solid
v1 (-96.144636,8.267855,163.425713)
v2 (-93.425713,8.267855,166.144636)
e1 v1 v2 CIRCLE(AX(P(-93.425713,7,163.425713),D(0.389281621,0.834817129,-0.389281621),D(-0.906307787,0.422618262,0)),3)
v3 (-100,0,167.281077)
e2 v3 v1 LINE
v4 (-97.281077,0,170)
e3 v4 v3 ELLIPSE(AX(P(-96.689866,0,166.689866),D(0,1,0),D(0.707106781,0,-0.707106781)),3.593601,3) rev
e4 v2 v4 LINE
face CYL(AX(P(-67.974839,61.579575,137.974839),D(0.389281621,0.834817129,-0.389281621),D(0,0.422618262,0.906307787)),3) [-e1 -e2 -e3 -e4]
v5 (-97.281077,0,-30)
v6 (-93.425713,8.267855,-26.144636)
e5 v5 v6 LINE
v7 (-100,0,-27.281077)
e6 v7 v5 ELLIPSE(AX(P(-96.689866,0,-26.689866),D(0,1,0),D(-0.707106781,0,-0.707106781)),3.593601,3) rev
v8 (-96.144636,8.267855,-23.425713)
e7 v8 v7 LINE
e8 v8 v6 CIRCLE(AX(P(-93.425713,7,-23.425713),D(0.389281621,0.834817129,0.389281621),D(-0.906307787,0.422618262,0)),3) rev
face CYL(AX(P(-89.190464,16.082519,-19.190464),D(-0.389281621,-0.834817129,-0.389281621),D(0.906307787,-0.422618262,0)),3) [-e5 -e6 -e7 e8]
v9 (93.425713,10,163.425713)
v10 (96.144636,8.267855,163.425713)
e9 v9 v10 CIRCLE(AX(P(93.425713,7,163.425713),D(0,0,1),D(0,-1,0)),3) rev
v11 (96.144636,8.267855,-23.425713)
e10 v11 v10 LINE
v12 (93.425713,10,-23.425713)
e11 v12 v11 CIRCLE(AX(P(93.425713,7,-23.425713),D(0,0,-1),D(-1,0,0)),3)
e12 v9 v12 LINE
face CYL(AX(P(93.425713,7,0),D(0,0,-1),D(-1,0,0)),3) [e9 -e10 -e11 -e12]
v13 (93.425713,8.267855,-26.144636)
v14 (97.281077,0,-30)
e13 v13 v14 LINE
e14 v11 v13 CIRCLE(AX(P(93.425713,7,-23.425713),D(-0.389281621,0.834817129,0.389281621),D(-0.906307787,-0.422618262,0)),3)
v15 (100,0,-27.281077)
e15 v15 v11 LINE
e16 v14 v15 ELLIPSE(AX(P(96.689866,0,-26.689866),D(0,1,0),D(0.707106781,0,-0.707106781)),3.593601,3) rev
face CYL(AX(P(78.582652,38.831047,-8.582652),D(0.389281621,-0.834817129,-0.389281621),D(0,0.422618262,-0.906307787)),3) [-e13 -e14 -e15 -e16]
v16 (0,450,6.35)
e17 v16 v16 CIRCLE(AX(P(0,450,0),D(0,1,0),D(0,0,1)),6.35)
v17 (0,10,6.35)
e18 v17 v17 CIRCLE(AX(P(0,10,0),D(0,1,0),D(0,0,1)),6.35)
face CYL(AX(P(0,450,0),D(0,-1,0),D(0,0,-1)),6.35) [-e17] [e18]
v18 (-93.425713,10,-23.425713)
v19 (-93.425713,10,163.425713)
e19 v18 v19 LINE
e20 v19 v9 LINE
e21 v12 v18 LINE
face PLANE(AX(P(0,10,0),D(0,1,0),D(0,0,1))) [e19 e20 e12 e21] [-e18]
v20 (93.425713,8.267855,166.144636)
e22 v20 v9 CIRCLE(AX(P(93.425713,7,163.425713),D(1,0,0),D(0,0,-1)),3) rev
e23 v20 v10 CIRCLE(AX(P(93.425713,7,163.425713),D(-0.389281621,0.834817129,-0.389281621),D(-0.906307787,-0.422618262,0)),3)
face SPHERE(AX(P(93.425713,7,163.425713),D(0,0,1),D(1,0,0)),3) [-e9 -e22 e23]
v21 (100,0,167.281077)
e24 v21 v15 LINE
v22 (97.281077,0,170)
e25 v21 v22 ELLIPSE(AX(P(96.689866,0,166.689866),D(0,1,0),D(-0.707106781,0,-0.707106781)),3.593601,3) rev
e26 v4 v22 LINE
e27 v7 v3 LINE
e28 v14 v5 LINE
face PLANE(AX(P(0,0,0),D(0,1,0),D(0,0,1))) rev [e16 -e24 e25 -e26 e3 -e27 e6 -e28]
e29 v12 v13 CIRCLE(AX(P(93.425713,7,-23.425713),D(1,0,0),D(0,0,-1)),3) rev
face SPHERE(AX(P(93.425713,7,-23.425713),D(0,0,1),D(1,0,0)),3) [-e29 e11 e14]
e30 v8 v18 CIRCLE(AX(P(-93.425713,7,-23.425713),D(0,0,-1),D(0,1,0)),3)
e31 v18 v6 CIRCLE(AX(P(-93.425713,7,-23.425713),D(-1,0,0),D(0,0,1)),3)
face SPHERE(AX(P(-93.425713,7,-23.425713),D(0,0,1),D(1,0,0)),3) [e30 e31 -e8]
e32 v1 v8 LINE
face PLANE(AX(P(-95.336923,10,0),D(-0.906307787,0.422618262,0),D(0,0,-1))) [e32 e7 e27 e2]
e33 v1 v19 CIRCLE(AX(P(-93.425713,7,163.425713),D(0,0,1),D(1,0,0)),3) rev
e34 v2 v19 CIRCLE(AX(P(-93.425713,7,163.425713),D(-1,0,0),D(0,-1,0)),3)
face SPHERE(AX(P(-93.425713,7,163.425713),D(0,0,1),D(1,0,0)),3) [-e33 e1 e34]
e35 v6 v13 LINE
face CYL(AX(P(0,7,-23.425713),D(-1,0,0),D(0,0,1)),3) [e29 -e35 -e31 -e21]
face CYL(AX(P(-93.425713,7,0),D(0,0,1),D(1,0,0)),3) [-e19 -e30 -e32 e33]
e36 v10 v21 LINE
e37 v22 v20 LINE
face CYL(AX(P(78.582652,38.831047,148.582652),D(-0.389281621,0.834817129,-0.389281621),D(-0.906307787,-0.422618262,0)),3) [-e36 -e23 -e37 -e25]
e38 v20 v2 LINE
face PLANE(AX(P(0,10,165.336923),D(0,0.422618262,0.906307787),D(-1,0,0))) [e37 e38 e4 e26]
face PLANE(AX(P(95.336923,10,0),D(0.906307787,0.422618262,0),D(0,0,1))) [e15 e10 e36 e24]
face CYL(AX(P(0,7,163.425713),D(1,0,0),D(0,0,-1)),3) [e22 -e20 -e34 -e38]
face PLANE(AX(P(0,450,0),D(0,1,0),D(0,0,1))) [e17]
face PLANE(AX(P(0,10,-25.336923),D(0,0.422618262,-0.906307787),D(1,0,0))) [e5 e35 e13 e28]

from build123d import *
from OCP.BRepFilletAPI import BRepFilletAPI_MakeChamfer

# Parameters (mm, degrees)
SKETCH1_R           = 6.35
BOSS_EXTRUDE1_DEPTH = 450
SKETCH2_W           = 200
SKETCH2_H           = 200
BOSS_EXTRUDE2_DEPTH = 10
CHAMFER1_SIZE       = 10
CHAMFER1_SIZE_2     = 4.663076582
FILLET1_R           = 3


# Some blends are built 0.0001 mm under size
with BuildPart() as part:
    # Sketch1 → Boss-Extrude1 (new body)
    with BuildSketch(Plane(origin=(0, 0, 0), x_dir=(1, 0, 0), z_dir=(0, 1, 0))):
        with Locations(Location((0, 0, 0), (0, 0, 270))):
            Circle(SKETCH1_R)
    extrude(amount=BOSS_EXTRUDE1_DEPTH)

    # Sketch2 → Boss-Extrude2 (add)
    with BuildSketch(Plane(origin=(0, 0, 0), x_dir=(1, 0, 0), z_dir=(0, 1, 0))):
        with Locations((0, -70)):
            Rectangle(SKETCH2_W, SKETCH2_H)
    extrude(amount=BOSS_EXTRUDE2_DEPTH)

    # Chamfer1
    chamfer1_edges_1 = [part.edges().sort_by_distance(p)[0] for p in [
        (-100, 10, 70),
    ]]
    chamfer1_side_1 = [part.faces().sort_by_distance(p)[0] for p in [
        (-100, 9.906738468, 70),
    ]]
    chamfer1_edges_2 = [part.edges().sort_by_distance(p)[0] for p in [
        (0, 10, -30),
    ]]
    chamfer1_side_2 = [part.faces().sort_by_distance(p)[0] for p in [
        (0, 9.906738468, -30),
    ]]
    chamfer1_edges_3 = [part.edges().sort_by_distance(p)[0] for p in [
        (100, 10, 70),
    ]]
    chamfer1_side_3 = [part.faces().sort_by_distance(p)[0] for p in [
        (100, 9.906738468, 70),
    ]]
    chamfer1_edges_4 = [part.edges().sort_by_distance(p)[0] for p in [
        (0, 10, 170),
    ]]
    chamfer1_side_4 = [part.faces().sort_by_distance(p)[0] for p in [
        (0, 9.906738468, 170),
    ]]
    chamfer1 = BRepFilletAPI_MakeChamfer(part.part.solid().wrapped)
    for e in chamfer1_edges_1:
        chamfer1.Add(CHAMFER1_SIZE - 0.0001, CHAMFER1_SIZE_2 - 0.0001, e.wrapped, chamfer1_side_1[0].wrapped)
    for e in chamfer1_edges_2:
        chamfer1.Add(CHAMFER1_SIZE - 0.0001, CHAMFER1_SIZE_2 - 0.0001, e.wrapped, chamfer1_side_2[0].wrapped)
    for e in chamfer1_edges_3:
        chamfer1.Add(CHAMFER1_SIZE - 0.0001, CHAMFER1_SIZE_2 - 0.0001, e.wrapped, chamfer1_side_3[0].wrapped)
    for e in chamfer1_edges_4:
        chamfer1.Add(CHAMFER1_SIZE - 0.0001, CHAMFER1_SIZE_2 - 0.0001, e.wrapped, chamfer1_side_4[0].wrapped)
    add(Compound.cast(chamfer1.Shape()), mode=Mode.REPLACE)  # a hair under: the kernel refuses the full size

    # Fillet1
    # the kernel refuses this fillet: 3 mm, written as the material it takes off along each edge
    with BuildSketch(Plane(origin=(93.425803391, 7, 163.425803391), x_dir=(0.8181037420217215, -0.5211920852493197, 0.24303307915492178), z_dir=(0.40339585418655427, 0.8213060146195212, 0.4033958541865531))) as fillet1_piece_1_section:
        Polygon((-4.845611884, -4.845611884), (4.845611884, -4.845611884), (4.845611884, 4.845611884), (-4.845611884, 4.845611884), align=None)
    fillet1_piece_1 = extrude(amount=4.845611884, mode=Mode.PRIVATE)
    fillet1_piece_1 = split(fillet1_piece_1, bisect_by=Plane(origin=(93.425803391, 7, 163.425803391), z_dir=(-0.3892785155895378, 0.834820025275396, -0.3892785155895367)), keep=Keep.TOP, mode=Mode.PRIVATE)
    fillet1_piece_1 = split(fillet1_piece_1, bisect_by=Plane(origin=(93.425803391, 7, 163.425803391), z_dir=(0, 0, 1)), keep=Keep.TOP, mode=Mode.PRIVATE)
    fillet1_piece_1 = split(fillet1_piece_1, bisect_by=Plane(origin=(93.425803391, 7, 163.425803391), z_dir=(1, 0, 0)), keep=Keep.TOP, mode=Mode.PRIVATE)
    fillet1_piece_1 = split(fillet1_piece_1, bisect_by=Plane(origin=(93.425803391, 8.267842866, 166.14473231), z_dir=(-2.562508249607615e-15, -0.42261428872649237, -0.9063096396729988)), keep=Keep.TOP, mode=Mode.PRIVATE)
    fillet1_piece_1 = split(fillet1_piece_1, bisect_by=Plane(origin=(96.14473231, 8.267842866, 163.425803391), z_dir=(-0.9063096396729988, -0.4226142887264923, 0)), keep=Keep.TOP, mode=Mode.PRIVATE)
    fillet1_piece_1 = split(fillet1_piece_1, bisect_by=Plane(origin=(93.425803391, 10, 163.425803391), z_dir=(0, -1, 0)), keep=Keep.TOP, mode=Mode.PRIVATE)
    fillet1_piece_1 = fillet1_piece_1 - Plane(origin=(93.425803391, 7, 163.425803391), x_dir=(-0.40339585418655427, -0.8213060146195212, -0.4033958541865531), z_dir=(0.8181037420217215, -0.5211920852493197, 0.24303307915492178)) * Sphere(FILLET1_R, mode=Mode.PRIVATE)
    add(fillet1_piece_1, mode=Mode.SUBTRACT)
    with BuildSketch(Plane(origin=(-93.425803391, 7, 163.425803391), x_dir=(-0.24303307915492378, -0.5211920852493191, 0.8181037420217212), z_dir=(-0.4033958541865524, 0.821306014619522, 0.4033958541865535))) as fillet1_piece_2_section:
        Polygon((-4.845611884, -4.845611884), (4.845611884, -4.845611884), (4.845611884, 4.845611884), (-4.845611884, 4.845611884), align=None)
    fillet1_piece_2 = extrude(amount=4.845611884, mode=Mode.PRIVATE)
    fillet1_piece_2 = split(fillet1_piece_2, bisect_by=Plane(origin=(-93.425803391, 7, 163.425803391), z_dir=(0.3892785155895374, 0.8348200252753952, -0.38927851558953863)), keep=Keep.TOP, mode=Mode.PRIVATE)
    fillet1_piece_2 = split(fillet1_piece_2, bisect_by=Plane(origin=(-93.425803391, 7, 163.425803391), z_dir=(-1, 0, 0)), keep=Keep.TOP, mode=Mode.PRIVATE)
    fillet1_piece_2 = split(fillet1_piece_2, bisect_by=Plane(origin=(-93.425803391, 7, 163.425803391), z_dir=(0, 0, 1)), keep=Keep.TOP, mode=Mode.PRIVATE)
    fillet1_piece_2 = split(fillet1_piece_2, bisect_by=Plane(origin=(-96.14473231, 8.267842866, 163.425803391), z_dir=(0.9063096396729988, -0.4226142887264923, 0)), keep=Keep.TOP, mode=Mode.PRIVATE)
    fillet1_piece_2 = split(fillet1_piece_2, bisect_by=Plane(origin=(-93.425803391, 8.267842866, 166.14473231), z_dir=(-2.562508249607615e-15, -0.42261428872649237, -0.9063096396729988)), keep=Keep.TOP, mode=Mode.PRIVATE)
    fillet1_piece_2 = split(fillet1_piece_2, bisect_by=Plane(origin=(-93.425803391, 10, 163.425803391), z_dir=(0, -1, 0)), keep=Keep.TOP, mode=Mode.PRIVATE)
    fillet1_piece_2 = fillet1_piece_2 - Plane(origin=(-93.425803391, 7, 163.425803391), x_dir=(0.4033958541865524, -0.821306014619522, -0.4033958541865535), z_dir=(-0.24303307915492378, -0.5211920852493191, 0.8181037420217212)) * Sphere(FILLET1_R, mode=Mode.PRIVATE)
    add(fillet1_piece_2, mode=Mode.SUBTRACT)
    with BuildSketch(Plane(origin=(93.425803391, 7, -23.425803391), x_dir=(-0.8181037420217211, 0.5211920852493194, 0.2430330791549239), z_dir=(0.4033958541865533, 0.8213060146195218, -0.4033958541865533))) as fillet1_piece_3_section:
        Polygon((-4.845611884, -4.845611884), (4.845611884, -4.845611884), (4.845611884, 4.845611884), (-4.845611884, 4.845611884), align=None)
    fillet1_piece_3 = extrude(amount=4.845611884, mode=Mode.PRIVATE)
    fillet1_piece_3 = split(fillet1_piece_3, bisect_by=Plane(origin=(93.425803391, 7, -23.425803391), z_dir=(-0.3892785155895376, 0.8348200252753957, 0.3892785155895376)), keep=Keep.TOP, mode=Mode.PRIVATE)
    fillet1_piece_3 = split(fillet1_piece_3, bisect_by=Plane(origin=(93.425803391, 7, -23.425803391), z_dir=(0, 0, -1)), keep=Keep.TOP, mode=Mode.PRIVATE)
    fillet1_piece_3 = split(fillet1_piece_3, bisect_by=Plane(origin=(93.425803391, 7, -23.425803391), z_dir=(1, 0, 0)), keep=Keep.TOP, mode=Mode.PRIVATE)
    fillet1_piece_3 = split(fillet1_piece_3, bisect_by=Plane(origin=(93.425803391, 8.267842866, -26.14473231), z_dir=(0, -0.4226142887264923, 0.9063096396729988)), keep=Keep.TOP, mode=Mode.PRIVATE)
    fillet1_piece_3 = split(fillet1_piece_3, bisect_by=Plane(origin=(96.14473231, 8.267842866, -23.425803391), z_dir=(-0.9063096396729988, -0.4226142887264923, 0)), keep=Keep.TOP, mode=Mode.PRIVATE)
    fillet1_piece_3 = split(fillet1_piece_3, bisect_by=Plane(origin=(93.425803391, 10, -23.425803391), z_dir=(0, -1, 0)), keep=Keep.TOP, mode=Mode.PRIVATE)
    fillet1_piece_3 = fillet1_piece_3 - Plane(origin=(93.425803391, 7, -23.425803391), x_dir=(-0.4033958541865533, -0.8213060146195218, 0.4033958541865533), z_dir=(-0.8181037420217211, 0.5211920852493194, 0.2430330791549239)) * Sphere(FILLET1_R, mode=Mode.PRIVATE)
    add(fillet1_piece_3, mode=Mode.SUBTRACT)
    with BuildSketch(Plane(origin=(-93.425803391, 7, -23.425803391), x_dir=(0.2430330791549239, 0.5211920852493194, 0.8181037420217211), z_dir=(-0.4033958541865533, 0.8213060146195218, -0.4033958541865533))) as fillet1_piece_4_section:
        Polygon((-4.845611884, -4.845611884), (4.845611884, -4.845611884), (4.845611884, 4.845611884), (-4.845611884, 4.845611884), align=None)
    fillet1_piece_4 = extrude(amount=4.845611884, mode=Mode.PRIVATE)
    fillet1_piece_4 = split(fillet1_piece_4, bisect_by=Plane(origin=(-93.425803391, 7, -23.425803391), z_dir=(0.3892785155895376, 0.8348200252753957, 0.3892785155895376)), keep=Keep.TOP, mode=Mode.PRIVATE)
    fillet1_piece_4 = split(fillet1_piece_4, bisect_by=Plane(origin=(-93.425803391, 7, -23.425803391), z_dir=(-1, 0, 0)), keep=Keep.TOP, mode=Mode.PRIVATE)
    fillet1_piece_4 = split(fillet1_piece_4, bisect_by=Plane(origin=(-93.425803391, 7, -23.425803391), z_dir=(0, 0, -1)), keep=Keep.TOP, mode=Mode.PRIVATE)
    fillet1_piece_4 = split(fillet1_piece_4, bisect_by=Plane(origin=(-96.14473231, 8.267842866, -23.425803391), z_dir=(0.9063096396729988, -0.4226142887264923, 0)), keep=Keep.TOP, mode=Mode.PRIVATE)
    fillet1_piece_4 = split(fillet1_piece_4, bisect_by=Plane(origin=(-93.425803391, 8.267842866, -26.14473231), z_dir=(0, -0.4226142887264923, 0.9063096396729988)), keep=Keep.TOP, mode=Mode.PRIVATE)
    fillet1_piece_4 = split(fillet1_piece_4, bisect_by=Plane(origin=(-93.425803391, 10, -23.425803391), z_dir=(0, -1, 0)), keep=Keep.TOP, mode=Mode.PRIVATE)
    fillet1_piece_4 = fillet1_piece_4 - Plane(origin=(-93.425803391, 7, -23.425803391), x_dir=(0.4033958541865533, -0.8213060146195218, 0.4033958541865533), z_dir=(0.2430330791549239, 0.5211920852493194, 0.8181037420217211)) * Sphere(FILLET1_R, mode=Mode.PRIVATE)
    add(fillet1_piece_4, mode=Mode.SUBTRACT)
    with BuildSketch(Plane(origin=(93.425803391, 10, 165.337023418), x_dir=(0, -0.9063096396729513, 0.4226142887265943), z_dir=(-1, 0, 0)), Plane(origin=(95.337023418, 10, -23.425803391), x_dir=(0.4226142887264939, -0.9063096396729982, 0), z_dir=(0, 0, 1))) as fillet1_piece_5:
        with BuildLine():
            CenterArc((FILLET1_R * 0.637073342265, -FILLET1_R), FILLET1_R, 90, 65.000251169)
            Line((-FILLET1_R * 0.269236297408, -FILLET1_R * 0.577385711273), (0, 0))
            Line((0, 0), (FILLET1_R * 0.637073342265, 0))
        make_face()
    extrude(amount=186.851606782, mode=Mode.SUBTRACT)
    with BuildSketch(Plane(origin=(-93.425803391, 10, -25.337023418), x_dir=(0, 0, 1), z_dir=(1, 0, 0)), Plane(origin=(-95.337023418, 10, 163.425803391), x_dir=(1, 0, 0), z_dir=(0, 0, -1))) as fillet1_piece_6:
        with BuildLine():
            CenterArc((FILLET1_R * 0.637073342265, FILLET1_R), FILLET1_R, 204.999748831, 65.000251169)
            Line((-FILLET1_R * 0.269236297408, FILLET1_R * 0.577385711274), (0, 0))
            Line((0, 0), (FILLET1_R * 0.637073342265, 0))
        make_face()
    extrude(amount=186.851606782, mode=Mode.SUBTRACT)
    with BuildSketch(Plane(origin=(102.437331252, -5.22683356, -32.437331252), x_dir=(0.16451466298238407, -0.3528068711963904, 0.9211200992815249), z_dir=(-0.3892785155895376, 0.8348200252753957, 0.3892785155895376)), Plane(origin=(102.437331252, -5.22683356, 172.437331252), x_dir=(-0.9211200992815247, -0.3528068711963899, 0.16451466298238568), z_dir=(-0.38927851558953774, 0.834820025275396, -0.3892785155895367))) as fillet1_piece_7:
        with BuildLine():
            CenterArc((FILLET1_R * 0.834820025275, -FILLET1_R), FILLET1_R, 90, 79.711610414)
            Line((-FILLET1_R * 0.149101224928, -FILLET1_R * 0.821397162964), (0, 0))
            Line((0, 0), (FILLET1_R * 0.834820025275, 0))
        make_face()
    extrude(amount=17.223193879, mode=Mode.SUBTRACT)
    with BuildSketch(Plane(origin=(-102.437331252, -5.22683356, -32.437331252), x_dir=(-0.16451466298237352, -0.35280687119639537, 0.9211200992815248), z_dir=(0.3892785155895376, 0.8348200252753957, 0.3892785155895376)), Plane(origin=(-102.437331252, -5.22683356, 172.437331252), x_dir=(0.9211200992815248, -0.35280687119640064, 0.16451466298236184), z_dir=(0.38927851558953747, 0.8348200252753953, -0.38927851558953863))) as fillet1_piece_8:
        with BuildLine():
            CenterArc((FILLET1_R * 0.834820025275, FILLET1_R), FILLET1_R, 190.288389586, 79.711610414)
            Line((-FILLET1_R * 0.149101224928, FILLET1_R * 0.821397162964), (0, 0))
            Line((0, 0), (FILLET1_R * 0.834820025275, 0))
        make_face()
    extrude(amount=17.223193879, mode=Mode.SUBTRACT)


solid = part.part
